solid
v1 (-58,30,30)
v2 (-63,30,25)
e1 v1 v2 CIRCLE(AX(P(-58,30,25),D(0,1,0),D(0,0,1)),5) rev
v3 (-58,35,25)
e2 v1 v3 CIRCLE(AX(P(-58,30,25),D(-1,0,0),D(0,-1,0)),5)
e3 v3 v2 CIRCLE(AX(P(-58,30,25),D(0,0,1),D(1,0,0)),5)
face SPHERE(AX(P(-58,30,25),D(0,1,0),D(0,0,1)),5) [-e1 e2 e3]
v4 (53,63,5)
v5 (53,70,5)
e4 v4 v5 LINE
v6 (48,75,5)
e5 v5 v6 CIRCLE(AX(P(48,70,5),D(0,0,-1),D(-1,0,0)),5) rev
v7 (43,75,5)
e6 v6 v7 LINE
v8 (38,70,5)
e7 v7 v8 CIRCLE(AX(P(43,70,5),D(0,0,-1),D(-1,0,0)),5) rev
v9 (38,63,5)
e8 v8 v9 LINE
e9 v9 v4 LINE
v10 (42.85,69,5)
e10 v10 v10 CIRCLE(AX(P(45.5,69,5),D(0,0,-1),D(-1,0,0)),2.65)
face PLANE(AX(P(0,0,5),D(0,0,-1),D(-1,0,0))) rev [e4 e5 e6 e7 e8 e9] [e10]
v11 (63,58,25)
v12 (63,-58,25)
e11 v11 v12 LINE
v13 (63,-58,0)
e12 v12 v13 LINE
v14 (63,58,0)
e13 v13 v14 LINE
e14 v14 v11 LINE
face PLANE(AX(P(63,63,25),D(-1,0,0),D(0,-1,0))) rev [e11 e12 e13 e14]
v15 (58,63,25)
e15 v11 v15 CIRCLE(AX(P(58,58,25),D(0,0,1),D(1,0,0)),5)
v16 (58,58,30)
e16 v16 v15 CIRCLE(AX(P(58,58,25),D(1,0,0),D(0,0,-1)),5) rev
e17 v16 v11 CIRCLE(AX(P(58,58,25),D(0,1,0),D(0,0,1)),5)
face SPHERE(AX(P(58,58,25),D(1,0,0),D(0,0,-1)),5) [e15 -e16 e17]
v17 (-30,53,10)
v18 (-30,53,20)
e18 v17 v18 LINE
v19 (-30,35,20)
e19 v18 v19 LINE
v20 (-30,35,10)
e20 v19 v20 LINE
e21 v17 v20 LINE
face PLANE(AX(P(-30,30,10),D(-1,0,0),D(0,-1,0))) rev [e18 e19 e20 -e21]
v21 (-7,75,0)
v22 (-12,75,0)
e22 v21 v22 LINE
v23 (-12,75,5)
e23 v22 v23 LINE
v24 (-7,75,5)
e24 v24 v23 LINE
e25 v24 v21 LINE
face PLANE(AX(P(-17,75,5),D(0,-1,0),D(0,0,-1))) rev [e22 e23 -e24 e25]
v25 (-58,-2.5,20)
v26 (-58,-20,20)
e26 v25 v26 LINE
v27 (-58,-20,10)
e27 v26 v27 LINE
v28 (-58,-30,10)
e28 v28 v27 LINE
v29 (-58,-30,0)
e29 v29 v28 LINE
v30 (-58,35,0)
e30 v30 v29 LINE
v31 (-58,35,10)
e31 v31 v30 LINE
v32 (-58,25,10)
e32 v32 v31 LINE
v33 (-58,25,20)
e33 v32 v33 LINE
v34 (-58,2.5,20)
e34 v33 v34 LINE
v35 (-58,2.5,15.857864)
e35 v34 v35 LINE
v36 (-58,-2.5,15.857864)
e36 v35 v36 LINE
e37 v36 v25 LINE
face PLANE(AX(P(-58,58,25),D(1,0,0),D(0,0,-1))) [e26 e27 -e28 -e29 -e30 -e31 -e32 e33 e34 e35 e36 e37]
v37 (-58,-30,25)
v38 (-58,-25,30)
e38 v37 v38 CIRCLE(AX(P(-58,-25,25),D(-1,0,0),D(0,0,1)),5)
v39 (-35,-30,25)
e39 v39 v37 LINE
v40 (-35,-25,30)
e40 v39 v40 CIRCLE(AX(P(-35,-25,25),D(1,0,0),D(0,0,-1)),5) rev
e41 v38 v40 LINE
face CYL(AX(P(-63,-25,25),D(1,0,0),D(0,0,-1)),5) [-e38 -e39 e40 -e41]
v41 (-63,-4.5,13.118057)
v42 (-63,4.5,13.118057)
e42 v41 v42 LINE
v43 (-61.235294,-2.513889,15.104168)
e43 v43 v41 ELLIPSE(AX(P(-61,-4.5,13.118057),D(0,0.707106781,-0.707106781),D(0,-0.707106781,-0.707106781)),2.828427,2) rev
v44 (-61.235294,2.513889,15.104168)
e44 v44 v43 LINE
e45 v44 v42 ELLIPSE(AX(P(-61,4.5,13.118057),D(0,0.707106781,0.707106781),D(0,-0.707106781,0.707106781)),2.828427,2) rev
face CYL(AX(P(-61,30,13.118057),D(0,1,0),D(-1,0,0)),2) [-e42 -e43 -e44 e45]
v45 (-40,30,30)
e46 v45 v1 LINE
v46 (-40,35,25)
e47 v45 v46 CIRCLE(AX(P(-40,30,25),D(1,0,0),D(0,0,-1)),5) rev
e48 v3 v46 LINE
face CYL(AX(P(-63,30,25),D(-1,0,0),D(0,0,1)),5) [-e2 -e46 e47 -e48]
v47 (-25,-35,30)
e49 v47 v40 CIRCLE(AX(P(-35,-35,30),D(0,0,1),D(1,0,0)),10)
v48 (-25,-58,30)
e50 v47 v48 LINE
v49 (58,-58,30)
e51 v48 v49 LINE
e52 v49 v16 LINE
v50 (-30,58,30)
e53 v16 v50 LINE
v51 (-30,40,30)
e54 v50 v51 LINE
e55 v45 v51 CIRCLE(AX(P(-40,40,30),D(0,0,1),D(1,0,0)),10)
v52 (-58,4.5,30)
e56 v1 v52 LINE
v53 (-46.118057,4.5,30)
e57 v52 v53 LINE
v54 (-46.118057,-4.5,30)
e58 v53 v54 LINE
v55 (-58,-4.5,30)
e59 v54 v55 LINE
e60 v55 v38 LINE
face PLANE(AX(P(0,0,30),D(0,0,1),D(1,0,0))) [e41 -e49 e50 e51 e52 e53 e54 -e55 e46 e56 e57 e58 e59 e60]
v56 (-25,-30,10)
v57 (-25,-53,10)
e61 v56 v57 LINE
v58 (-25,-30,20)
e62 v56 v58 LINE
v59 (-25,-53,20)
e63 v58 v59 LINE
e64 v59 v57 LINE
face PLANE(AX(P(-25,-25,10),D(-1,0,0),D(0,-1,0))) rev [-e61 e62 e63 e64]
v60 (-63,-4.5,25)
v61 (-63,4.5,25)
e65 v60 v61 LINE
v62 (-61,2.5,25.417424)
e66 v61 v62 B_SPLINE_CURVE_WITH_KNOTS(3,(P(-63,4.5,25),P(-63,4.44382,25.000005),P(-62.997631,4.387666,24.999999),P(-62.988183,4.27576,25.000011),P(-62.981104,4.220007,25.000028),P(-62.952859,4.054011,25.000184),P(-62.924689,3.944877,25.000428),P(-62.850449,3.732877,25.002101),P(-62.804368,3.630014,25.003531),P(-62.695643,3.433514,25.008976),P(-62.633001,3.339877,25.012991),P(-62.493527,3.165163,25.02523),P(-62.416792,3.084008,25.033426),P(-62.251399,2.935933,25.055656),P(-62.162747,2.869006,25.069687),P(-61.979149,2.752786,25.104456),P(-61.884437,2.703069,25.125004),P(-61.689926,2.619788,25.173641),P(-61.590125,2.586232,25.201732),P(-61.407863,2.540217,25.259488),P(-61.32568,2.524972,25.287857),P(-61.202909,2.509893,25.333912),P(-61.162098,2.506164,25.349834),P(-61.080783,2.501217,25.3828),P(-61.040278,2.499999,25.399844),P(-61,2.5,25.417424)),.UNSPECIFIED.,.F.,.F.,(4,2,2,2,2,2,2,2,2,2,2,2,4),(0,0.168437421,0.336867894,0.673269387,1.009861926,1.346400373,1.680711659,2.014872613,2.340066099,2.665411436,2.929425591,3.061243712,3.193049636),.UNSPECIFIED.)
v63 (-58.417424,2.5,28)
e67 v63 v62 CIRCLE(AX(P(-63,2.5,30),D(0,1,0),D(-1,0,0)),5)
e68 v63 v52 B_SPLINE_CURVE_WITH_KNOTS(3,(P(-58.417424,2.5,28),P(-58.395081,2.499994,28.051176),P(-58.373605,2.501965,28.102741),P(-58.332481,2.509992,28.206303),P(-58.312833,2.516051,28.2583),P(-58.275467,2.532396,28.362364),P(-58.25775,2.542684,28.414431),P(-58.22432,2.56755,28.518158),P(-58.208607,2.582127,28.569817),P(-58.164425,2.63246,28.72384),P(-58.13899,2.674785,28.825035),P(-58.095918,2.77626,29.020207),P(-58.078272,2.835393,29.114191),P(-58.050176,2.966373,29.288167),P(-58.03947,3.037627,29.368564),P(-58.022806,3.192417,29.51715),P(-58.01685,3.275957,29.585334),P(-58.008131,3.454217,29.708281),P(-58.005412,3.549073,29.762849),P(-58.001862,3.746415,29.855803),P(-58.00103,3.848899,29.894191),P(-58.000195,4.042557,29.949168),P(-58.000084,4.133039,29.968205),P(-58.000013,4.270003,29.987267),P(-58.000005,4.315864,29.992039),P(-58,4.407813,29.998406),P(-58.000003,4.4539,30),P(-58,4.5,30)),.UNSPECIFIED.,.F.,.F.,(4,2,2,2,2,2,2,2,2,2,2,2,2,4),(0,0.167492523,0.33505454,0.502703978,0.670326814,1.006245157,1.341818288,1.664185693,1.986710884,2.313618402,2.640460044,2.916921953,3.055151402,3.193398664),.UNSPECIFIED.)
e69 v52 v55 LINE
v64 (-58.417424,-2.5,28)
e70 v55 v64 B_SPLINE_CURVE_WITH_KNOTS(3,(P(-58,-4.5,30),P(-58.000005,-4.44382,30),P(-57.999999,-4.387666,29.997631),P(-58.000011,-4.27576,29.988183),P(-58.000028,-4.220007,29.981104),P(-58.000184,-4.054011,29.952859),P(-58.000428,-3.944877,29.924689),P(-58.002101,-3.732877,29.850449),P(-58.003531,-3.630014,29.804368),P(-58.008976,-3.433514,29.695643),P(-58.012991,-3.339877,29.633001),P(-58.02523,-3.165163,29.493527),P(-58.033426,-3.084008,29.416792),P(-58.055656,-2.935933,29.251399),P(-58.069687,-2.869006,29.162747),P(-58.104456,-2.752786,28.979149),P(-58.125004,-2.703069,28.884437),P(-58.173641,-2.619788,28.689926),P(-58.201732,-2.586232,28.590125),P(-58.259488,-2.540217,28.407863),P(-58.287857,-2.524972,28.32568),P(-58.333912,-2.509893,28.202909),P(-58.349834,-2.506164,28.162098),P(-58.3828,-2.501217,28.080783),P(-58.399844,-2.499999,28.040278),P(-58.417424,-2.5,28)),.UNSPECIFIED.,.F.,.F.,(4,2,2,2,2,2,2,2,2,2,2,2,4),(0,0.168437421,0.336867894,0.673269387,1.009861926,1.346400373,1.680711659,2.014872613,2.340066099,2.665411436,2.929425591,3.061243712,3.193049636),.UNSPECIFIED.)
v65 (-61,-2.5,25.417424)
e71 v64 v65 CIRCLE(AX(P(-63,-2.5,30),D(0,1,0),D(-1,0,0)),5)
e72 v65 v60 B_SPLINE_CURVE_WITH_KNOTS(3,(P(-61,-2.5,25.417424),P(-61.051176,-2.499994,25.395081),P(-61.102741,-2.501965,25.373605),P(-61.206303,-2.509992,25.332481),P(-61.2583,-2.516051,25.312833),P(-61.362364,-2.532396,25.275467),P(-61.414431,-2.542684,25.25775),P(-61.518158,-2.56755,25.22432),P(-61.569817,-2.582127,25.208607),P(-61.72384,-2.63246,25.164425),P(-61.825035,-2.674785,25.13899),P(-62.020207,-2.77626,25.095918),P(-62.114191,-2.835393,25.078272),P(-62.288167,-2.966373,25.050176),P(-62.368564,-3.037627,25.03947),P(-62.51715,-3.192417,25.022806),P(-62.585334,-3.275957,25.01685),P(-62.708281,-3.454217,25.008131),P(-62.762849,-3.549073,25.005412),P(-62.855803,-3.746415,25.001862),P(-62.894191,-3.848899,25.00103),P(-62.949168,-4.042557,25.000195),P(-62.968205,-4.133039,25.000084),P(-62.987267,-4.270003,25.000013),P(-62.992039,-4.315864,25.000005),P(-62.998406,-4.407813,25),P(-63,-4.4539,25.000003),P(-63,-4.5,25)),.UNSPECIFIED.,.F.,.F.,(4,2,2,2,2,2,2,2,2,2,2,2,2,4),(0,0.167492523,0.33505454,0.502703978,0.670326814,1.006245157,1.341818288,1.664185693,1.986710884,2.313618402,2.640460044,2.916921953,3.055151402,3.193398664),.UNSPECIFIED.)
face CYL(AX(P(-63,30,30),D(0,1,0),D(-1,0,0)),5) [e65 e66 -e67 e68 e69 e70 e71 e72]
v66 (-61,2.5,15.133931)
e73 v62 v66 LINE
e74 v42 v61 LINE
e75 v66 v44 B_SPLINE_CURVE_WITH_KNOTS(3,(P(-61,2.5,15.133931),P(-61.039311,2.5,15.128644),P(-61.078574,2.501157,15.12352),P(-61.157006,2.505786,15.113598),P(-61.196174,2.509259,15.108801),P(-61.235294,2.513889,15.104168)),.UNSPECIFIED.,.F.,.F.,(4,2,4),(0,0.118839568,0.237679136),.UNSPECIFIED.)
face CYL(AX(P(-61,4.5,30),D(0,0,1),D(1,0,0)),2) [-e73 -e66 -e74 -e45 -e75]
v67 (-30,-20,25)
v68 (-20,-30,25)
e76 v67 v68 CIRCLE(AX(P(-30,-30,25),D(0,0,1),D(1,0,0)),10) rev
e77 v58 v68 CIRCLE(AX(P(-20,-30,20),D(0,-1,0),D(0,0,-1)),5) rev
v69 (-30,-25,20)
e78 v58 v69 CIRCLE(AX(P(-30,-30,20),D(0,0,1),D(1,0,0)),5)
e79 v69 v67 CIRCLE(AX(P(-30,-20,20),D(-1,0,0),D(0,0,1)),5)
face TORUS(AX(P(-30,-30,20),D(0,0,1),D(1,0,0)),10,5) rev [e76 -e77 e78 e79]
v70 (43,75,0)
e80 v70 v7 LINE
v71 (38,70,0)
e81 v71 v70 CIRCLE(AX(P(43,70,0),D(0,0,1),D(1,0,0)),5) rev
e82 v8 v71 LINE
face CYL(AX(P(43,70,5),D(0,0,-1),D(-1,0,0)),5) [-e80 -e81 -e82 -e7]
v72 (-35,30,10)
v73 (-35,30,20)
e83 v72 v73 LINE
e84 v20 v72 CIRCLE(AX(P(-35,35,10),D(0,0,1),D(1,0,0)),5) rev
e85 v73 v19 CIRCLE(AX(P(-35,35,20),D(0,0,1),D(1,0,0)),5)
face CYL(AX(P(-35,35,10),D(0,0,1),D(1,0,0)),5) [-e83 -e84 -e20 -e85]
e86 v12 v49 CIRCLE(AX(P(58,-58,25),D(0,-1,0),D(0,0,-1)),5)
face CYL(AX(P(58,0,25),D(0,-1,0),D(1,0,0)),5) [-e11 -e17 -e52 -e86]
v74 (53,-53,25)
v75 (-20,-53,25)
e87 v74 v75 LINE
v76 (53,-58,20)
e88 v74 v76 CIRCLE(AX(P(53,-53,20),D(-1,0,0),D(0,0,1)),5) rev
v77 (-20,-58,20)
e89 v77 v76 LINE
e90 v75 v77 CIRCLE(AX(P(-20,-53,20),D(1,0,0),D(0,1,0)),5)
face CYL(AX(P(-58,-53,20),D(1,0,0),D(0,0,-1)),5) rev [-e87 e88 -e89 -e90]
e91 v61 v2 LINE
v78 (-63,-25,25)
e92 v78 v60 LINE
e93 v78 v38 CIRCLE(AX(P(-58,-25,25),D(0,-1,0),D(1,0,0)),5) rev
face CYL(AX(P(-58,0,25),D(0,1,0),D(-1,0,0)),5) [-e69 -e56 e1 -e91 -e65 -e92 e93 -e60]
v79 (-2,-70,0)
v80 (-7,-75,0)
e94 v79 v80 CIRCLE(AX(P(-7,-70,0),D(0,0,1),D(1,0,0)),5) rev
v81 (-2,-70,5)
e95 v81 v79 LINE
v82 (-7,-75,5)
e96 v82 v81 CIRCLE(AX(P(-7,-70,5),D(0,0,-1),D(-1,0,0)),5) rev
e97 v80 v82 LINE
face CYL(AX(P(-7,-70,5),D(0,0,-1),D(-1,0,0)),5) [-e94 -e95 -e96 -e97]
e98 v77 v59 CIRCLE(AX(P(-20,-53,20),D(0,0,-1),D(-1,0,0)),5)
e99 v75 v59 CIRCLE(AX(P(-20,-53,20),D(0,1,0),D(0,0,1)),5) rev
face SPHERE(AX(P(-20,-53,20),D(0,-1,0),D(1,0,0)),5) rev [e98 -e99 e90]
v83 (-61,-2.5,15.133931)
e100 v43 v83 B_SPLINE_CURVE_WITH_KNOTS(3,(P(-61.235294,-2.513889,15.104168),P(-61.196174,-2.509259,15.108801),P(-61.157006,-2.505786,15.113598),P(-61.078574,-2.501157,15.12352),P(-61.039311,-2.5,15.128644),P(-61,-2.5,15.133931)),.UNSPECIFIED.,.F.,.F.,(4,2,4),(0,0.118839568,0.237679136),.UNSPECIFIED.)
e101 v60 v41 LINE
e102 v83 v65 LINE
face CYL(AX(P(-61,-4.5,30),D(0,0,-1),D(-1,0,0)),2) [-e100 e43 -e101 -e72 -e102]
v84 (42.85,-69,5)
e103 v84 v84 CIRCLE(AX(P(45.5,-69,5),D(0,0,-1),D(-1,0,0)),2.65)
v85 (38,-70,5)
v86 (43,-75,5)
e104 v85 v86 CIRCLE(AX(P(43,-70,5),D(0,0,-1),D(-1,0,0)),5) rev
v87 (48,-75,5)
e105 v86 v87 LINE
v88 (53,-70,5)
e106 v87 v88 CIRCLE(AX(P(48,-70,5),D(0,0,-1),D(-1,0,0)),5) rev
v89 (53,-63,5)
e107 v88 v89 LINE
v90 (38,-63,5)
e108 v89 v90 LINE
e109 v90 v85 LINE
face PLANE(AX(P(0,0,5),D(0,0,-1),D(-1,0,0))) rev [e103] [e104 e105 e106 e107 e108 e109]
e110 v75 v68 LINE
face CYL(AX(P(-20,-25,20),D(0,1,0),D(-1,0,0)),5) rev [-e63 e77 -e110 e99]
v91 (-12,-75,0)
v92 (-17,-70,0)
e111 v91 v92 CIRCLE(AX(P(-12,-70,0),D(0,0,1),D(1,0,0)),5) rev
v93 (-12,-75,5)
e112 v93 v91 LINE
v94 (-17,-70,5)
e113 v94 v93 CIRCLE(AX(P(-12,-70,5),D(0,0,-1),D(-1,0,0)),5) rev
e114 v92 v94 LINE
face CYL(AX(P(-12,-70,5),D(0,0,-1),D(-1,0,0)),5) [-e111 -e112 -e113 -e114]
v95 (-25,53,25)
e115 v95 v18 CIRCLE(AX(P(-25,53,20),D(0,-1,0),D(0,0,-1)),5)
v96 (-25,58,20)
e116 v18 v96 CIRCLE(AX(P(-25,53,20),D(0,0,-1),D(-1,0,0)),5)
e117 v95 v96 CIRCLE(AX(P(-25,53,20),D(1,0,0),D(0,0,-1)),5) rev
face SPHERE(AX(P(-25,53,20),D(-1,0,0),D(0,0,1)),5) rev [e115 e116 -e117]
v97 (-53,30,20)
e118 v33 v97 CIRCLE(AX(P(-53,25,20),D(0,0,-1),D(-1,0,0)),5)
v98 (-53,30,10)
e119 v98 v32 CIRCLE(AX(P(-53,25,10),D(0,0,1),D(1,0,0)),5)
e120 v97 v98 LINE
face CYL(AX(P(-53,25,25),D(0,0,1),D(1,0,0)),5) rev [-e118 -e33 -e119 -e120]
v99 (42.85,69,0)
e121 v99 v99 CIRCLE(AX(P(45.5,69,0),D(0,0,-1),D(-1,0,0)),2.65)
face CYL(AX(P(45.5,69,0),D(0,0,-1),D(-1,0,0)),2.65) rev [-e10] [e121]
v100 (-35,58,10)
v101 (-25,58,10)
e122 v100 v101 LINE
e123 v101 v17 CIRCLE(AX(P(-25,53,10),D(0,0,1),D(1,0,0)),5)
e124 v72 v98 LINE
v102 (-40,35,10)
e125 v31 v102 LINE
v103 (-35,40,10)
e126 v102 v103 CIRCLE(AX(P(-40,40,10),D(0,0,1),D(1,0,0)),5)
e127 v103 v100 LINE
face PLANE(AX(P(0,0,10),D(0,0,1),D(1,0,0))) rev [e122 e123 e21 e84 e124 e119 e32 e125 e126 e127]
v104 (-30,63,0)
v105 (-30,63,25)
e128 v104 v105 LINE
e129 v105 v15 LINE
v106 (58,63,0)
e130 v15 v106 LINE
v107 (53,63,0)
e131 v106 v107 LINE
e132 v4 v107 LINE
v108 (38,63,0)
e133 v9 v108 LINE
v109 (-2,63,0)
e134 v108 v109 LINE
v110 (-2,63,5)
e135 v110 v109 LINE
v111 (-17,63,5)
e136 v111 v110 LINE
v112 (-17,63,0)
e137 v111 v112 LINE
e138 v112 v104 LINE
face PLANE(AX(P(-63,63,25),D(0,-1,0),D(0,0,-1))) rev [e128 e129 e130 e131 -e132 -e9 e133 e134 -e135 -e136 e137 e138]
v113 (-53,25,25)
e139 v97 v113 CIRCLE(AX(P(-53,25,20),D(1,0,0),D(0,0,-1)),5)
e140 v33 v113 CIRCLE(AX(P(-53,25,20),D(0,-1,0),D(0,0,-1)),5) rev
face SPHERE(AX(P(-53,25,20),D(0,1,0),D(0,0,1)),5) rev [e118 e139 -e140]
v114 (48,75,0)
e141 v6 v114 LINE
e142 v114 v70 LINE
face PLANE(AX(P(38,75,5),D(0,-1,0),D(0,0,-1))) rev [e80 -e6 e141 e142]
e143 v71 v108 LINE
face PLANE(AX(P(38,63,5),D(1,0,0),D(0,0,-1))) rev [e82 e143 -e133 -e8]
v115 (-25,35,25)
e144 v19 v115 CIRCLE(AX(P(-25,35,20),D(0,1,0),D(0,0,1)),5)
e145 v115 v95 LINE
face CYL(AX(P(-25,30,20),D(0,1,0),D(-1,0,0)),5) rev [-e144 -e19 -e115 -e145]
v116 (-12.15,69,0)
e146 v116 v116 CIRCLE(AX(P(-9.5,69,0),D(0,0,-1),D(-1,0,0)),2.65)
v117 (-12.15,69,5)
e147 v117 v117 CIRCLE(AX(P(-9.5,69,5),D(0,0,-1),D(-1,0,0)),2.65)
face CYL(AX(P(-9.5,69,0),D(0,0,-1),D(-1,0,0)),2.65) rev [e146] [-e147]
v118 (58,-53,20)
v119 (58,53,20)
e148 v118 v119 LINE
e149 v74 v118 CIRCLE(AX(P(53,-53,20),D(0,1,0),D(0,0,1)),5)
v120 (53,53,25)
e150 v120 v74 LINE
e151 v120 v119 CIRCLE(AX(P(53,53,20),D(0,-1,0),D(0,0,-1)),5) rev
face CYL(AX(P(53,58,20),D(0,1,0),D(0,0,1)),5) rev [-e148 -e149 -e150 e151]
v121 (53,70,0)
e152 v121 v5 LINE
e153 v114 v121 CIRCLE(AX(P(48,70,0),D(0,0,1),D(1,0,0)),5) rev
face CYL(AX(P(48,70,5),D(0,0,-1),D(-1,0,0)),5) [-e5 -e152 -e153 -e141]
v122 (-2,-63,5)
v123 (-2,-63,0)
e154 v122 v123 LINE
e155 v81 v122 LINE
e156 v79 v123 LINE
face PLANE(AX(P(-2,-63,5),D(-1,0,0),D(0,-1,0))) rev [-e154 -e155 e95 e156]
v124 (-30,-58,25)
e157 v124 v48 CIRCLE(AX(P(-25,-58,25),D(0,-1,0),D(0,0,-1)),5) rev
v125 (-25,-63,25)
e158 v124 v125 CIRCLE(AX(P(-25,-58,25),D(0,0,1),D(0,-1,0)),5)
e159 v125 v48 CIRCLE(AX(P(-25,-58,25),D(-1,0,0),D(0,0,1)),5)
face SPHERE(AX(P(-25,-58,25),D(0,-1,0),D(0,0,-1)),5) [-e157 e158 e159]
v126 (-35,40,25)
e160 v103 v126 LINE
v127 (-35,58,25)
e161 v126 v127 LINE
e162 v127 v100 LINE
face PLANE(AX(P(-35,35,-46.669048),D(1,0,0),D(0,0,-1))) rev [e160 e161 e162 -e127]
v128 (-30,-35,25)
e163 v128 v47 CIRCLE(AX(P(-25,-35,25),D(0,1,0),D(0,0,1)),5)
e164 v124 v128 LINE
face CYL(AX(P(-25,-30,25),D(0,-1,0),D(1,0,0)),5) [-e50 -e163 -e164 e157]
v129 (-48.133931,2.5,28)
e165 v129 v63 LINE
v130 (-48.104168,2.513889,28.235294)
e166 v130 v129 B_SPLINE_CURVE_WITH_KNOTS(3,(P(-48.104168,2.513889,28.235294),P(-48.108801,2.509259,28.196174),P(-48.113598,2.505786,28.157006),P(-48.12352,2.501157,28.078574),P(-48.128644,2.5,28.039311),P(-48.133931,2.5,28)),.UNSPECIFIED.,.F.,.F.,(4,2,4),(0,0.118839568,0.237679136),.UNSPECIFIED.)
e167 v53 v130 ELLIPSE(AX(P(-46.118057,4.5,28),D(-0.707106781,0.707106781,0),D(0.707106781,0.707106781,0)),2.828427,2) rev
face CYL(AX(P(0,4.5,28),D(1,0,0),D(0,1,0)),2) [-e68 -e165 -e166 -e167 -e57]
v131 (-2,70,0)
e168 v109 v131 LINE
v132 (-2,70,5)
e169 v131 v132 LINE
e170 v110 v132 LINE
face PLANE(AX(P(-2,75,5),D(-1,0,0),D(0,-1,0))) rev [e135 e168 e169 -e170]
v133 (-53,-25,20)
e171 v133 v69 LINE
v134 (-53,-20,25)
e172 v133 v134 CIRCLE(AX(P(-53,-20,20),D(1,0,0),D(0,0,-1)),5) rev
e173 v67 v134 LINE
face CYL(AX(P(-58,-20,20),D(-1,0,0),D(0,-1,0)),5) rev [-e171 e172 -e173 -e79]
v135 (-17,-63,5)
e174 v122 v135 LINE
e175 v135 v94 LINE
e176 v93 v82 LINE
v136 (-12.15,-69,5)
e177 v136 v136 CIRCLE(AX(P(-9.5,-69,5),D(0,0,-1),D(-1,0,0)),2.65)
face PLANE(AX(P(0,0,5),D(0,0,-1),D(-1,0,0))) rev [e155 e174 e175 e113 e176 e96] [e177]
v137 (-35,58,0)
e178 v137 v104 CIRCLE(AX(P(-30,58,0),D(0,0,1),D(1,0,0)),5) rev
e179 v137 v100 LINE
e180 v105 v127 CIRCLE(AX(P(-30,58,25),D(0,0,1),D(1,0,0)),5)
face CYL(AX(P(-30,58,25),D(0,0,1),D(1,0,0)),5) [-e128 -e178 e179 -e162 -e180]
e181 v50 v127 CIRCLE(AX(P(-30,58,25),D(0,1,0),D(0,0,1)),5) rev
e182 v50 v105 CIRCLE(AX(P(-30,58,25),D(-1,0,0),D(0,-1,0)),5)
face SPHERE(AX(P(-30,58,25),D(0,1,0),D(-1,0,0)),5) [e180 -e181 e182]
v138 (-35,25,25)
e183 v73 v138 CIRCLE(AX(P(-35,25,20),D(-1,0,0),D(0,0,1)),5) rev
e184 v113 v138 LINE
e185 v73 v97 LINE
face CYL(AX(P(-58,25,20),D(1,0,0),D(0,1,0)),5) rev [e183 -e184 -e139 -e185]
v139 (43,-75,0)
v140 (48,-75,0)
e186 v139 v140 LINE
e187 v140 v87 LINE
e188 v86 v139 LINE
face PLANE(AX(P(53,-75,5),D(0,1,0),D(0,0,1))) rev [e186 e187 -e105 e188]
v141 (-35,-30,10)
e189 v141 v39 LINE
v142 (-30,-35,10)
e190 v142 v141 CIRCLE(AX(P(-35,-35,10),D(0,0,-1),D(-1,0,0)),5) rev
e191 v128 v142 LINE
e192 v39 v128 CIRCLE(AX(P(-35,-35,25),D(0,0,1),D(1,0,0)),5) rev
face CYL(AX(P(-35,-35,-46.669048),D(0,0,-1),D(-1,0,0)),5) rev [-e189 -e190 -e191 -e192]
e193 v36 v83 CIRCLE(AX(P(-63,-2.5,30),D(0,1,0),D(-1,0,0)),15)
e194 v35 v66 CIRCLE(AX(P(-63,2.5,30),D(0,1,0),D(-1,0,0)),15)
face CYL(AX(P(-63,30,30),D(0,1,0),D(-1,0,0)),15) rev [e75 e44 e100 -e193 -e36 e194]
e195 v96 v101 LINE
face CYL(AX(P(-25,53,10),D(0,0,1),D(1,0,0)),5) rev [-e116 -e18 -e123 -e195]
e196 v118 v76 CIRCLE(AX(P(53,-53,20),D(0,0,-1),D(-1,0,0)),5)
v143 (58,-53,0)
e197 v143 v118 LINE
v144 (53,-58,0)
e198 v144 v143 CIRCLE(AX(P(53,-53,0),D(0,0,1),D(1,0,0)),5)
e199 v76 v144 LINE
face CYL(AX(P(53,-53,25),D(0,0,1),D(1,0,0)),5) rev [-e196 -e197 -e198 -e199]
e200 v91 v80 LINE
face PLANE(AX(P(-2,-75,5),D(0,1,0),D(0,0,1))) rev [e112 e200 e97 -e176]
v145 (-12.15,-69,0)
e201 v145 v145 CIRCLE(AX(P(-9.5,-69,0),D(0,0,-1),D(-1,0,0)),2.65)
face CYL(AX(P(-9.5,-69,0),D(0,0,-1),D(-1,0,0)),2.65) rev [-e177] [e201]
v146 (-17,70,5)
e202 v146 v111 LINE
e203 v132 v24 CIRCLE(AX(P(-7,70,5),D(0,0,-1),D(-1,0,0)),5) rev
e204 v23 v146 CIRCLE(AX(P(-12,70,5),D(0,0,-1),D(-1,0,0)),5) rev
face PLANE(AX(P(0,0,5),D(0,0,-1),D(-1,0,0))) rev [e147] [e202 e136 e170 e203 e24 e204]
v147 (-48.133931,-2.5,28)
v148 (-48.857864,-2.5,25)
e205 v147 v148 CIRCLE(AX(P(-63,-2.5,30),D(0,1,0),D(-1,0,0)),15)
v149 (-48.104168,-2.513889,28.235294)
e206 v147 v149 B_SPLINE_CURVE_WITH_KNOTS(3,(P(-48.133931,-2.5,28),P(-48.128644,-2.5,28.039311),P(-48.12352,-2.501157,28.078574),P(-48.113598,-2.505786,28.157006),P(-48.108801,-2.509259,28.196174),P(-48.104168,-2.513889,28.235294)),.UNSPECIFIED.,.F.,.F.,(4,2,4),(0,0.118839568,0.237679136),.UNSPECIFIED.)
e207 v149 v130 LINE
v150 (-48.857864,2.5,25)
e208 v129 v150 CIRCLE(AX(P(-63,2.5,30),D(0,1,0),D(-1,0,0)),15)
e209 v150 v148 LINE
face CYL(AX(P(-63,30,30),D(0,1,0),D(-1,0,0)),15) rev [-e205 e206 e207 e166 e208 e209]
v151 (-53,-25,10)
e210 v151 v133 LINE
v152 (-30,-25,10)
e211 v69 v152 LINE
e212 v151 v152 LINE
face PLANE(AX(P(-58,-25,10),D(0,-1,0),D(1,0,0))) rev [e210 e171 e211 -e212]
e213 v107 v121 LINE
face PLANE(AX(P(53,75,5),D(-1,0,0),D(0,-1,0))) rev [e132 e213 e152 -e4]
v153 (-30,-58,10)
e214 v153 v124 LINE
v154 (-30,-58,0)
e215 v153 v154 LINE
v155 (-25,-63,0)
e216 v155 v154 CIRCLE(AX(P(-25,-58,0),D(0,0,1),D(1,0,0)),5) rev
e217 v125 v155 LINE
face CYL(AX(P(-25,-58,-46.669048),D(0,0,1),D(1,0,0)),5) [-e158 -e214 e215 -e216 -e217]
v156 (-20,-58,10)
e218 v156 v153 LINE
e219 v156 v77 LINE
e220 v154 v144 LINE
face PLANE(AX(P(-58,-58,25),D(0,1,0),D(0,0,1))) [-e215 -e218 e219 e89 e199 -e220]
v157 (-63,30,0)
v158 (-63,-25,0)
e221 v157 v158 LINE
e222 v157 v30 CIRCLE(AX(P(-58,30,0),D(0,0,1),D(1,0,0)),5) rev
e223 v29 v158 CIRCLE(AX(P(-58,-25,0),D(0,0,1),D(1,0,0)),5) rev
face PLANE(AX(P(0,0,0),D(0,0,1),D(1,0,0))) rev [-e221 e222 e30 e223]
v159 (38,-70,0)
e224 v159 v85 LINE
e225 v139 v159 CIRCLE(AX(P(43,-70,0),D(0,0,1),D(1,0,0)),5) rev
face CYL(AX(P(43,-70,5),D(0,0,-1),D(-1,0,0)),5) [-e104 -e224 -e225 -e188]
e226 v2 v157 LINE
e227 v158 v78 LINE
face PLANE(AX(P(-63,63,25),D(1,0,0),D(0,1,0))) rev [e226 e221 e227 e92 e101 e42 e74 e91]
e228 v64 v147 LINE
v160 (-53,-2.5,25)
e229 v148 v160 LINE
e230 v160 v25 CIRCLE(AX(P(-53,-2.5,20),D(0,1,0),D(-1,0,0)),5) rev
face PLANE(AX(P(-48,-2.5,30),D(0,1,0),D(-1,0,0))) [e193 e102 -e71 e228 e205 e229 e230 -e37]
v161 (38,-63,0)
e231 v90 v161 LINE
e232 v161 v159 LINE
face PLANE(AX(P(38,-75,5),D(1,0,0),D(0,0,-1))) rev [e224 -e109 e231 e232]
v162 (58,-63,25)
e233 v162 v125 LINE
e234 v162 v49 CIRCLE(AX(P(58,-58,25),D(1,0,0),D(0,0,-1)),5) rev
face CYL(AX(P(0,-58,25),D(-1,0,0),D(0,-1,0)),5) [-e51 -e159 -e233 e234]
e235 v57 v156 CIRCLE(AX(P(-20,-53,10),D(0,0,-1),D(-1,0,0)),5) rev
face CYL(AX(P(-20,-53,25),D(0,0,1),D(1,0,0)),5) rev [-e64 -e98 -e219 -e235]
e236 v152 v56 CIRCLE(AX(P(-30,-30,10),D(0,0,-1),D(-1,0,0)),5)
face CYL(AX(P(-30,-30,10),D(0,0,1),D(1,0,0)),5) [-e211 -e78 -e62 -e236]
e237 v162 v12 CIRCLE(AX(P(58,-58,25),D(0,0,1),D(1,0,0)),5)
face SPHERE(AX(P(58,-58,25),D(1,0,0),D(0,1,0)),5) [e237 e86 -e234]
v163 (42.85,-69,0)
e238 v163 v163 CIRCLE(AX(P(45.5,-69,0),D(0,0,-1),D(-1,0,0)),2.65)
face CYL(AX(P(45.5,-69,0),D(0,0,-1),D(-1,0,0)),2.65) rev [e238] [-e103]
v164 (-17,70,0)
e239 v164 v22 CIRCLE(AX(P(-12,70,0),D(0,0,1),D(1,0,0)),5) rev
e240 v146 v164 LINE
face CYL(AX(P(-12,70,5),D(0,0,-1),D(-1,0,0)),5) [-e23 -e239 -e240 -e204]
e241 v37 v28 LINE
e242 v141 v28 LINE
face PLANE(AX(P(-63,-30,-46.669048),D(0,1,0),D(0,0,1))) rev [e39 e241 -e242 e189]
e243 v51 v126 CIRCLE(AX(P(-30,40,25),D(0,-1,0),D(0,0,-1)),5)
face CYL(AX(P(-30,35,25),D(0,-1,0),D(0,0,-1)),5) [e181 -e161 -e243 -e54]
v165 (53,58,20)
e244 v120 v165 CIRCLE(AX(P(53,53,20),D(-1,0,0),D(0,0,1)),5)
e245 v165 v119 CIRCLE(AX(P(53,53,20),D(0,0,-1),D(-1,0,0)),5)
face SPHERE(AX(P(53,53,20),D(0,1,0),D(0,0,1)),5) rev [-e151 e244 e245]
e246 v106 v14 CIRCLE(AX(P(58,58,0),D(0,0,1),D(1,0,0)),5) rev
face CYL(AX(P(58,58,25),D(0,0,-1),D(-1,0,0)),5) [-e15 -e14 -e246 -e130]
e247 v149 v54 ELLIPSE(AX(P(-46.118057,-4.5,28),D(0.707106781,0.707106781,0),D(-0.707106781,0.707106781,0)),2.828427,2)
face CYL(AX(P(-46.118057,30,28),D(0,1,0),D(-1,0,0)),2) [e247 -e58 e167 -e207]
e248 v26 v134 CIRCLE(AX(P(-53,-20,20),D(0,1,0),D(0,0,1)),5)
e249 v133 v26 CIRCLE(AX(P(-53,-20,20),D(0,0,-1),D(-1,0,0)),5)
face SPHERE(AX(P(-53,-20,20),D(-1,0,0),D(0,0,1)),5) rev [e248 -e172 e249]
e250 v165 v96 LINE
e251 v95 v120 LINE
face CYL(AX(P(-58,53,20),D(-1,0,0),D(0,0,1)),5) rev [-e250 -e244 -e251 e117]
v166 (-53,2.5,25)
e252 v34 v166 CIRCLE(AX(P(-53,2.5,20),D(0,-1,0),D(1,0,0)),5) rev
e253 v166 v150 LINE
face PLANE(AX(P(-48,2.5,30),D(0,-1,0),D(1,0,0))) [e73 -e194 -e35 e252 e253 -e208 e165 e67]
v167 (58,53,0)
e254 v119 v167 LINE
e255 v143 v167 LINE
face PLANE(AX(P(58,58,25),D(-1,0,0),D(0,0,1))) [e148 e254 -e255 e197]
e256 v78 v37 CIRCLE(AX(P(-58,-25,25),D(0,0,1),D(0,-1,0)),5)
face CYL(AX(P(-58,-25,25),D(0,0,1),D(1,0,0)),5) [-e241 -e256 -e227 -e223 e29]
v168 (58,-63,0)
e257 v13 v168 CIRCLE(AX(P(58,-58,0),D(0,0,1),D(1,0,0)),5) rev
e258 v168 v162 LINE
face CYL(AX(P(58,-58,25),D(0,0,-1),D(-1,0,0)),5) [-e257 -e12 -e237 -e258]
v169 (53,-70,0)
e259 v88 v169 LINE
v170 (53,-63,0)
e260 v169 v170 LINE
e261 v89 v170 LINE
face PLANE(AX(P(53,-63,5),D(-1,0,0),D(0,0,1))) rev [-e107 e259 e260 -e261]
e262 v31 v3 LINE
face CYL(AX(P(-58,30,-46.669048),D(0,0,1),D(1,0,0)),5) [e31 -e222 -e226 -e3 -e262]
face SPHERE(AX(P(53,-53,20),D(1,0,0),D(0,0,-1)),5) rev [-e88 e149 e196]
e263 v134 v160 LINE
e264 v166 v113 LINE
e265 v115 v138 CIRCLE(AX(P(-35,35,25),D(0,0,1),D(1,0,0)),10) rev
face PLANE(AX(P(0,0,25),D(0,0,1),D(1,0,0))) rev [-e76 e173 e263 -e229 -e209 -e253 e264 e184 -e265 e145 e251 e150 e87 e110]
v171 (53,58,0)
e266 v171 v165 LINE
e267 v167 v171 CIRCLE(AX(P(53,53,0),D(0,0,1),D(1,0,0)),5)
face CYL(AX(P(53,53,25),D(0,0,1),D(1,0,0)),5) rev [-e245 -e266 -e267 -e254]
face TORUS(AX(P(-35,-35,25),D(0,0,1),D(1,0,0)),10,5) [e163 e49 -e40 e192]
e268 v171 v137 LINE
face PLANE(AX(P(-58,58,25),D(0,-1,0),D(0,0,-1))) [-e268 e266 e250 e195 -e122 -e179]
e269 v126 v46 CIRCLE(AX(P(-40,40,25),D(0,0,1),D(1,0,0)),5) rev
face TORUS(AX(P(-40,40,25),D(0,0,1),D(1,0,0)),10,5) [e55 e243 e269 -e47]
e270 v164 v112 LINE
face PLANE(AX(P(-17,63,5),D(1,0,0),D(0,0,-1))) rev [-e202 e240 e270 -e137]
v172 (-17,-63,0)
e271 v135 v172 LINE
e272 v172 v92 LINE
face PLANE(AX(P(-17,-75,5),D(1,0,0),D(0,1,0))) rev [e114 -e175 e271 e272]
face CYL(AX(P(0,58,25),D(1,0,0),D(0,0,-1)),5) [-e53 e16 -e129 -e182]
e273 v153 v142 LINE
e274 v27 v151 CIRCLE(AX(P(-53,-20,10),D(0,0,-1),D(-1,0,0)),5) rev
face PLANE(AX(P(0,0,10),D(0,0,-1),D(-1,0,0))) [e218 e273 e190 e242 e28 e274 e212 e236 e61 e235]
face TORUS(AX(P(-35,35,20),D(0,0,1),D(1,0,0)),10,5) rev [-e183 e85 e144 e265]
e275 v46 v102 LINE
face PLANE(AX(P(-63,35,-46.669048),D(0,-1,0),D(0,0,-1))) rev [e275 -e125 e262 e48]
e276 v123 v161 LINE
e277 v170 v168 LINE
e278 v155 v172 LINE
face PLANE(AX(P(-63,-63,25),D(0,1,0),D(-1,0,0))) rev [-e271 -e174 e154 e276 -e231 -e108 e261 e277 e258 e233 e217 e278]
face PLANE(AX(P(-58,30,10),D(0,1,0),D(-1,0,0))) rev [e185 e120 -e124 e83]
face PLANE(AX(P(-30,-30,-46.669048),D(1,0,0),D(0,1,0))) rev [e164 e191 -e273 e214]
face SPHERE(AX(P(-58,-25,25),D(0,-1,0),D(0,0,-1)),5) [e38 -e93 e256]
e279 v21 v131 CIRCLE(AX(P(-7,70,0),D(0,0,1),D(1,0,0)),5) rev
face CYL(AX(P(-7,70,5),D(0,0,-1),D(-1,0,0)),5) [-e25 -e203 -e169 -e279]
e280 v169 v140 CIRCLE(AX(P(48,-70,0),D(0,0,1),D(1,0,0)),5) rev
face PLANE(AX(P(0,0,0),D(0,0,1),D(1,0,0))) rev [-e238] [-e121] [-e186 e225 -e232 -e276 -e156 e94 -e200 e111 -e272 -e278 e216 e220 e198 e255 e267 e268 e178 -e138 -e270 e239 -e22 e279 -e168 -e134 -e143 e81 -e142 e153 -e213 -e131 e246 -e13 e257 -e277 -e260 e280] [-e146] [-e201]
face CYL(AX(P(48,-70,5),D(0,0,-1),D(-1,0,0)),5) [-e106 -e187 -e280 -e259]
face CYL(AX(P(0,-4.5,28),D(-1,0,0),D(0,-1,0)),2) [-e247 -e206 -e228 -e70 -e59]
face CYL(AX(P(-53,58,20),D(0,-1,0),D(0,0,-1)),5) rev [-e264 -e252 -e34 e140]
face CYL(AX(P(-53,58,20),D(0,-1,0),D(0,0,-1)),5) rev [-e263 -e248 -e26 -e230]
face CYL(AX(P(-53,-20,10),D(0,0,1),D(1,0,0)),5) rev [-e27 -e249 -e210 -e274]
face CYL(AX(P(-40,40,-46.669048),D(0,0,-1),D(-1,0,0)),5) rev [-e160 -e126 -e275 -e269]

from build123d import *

# Parameters (mm, degrees)
ESQUISSE1_W             = 126
ESQUISSE1_H             = 126
ESQUISSE1_W_2           = 116
ESQUISSE1_H_2           = 116
BOSS_EXTRU_1_DEPTH      = 25
ESQUISSE2_W             = 126
ESQUISSE2_H             = 126
BOSS_EXTRU_2_DEPTH      = 5
ENL_V_START             = -30
ESQUISSE3_W             = 28
ESQUISSE3_H             = 28
ESQUISSE3_W_2           = 33
ESQUISSE3_H_2           = 33
ENL_V_MAT_EXTRU_1_DEPTH = 30
BOSS_EXTRU_3_DEPTH      = 15
ESQUISSE5_W             = 15
ESQUISSE5_H             = 12
BOSS_EXTRU_4_DEPTH      = 5
CONG_1_R                = 5
D_GAGEMENT_M51_D        = 5.3
ESQUISSE9_W             = 10
ESQUISSE9_H             = 5
CONG_2_R                = 2


# Some blends are built 0.0001 mm under size
with BuildPart() as part:
    # Esquisse1 → Boss.-Extru.1 (new body)
    with BuildSketch(Plane.XY):
        Rectangle(ESQUISSE1_W, ESQUISSE1_H)
        Rectangle(ESQUISSE1_W_2, ESQUISSE1_H_2, mode=Mode.SUBTRACT)
    extrude(amount=BOSS_EXTRU_1_DEPTH)

    # Esquisse2 → Boss.-Extru.2 (add)
    with BuildSketch(Plane.XY.offset(25)):
        Rectangle(ESQUISSE2_W, ESQUISSE2_H)
    extrude(amount=BOSS_EXTRU_2_DEPTH)

    # Esquisse3 → Enlèv. mat.-Extru.1 (cut)
    with BuildSketch(Plane.XY.offset(30).offset(ENL_V_START)):
        with Locations((-49, 49)):
            Rectangle(ESQUISSE3_W, ESQUISSE3_H)
        with Locations((-46.5, -46.5)):
            Rectangle(ESQUISSE3_W_2, ESQUISSE3_H_2)
    extrude(amount=ENL_V_MAT_EXTRU_1_DEPTH, mode=Mode.SUBTRACT)

    # Esquisse4 → Boss.-Extru.3 (add)
    with BuildSketch(Plane(origin=(0, 0, 25), x_dir=(-1, 0, 0), z_dir=(0, 0, -1))):
        Polygon((35, 58), (35, 35), (58, 35), (58, 30), (30, 30), (30, 58), align=None)
        Polygon((58, -25), (25, -25), (25, -58), (30, -58), (30, -30), (58, -30), align=None)
    extrude(amount=BOSS_EXTRU_3_DEPTH)

    # Esquisse5 → Boss.-Extru.4 (add)
    with BuildSketch(Plane.XY):
        with Locations((-9.5, 69)):
            Rectangle(ESQUISSE5_W, ESQUISSE5_H)
        with Locations((45.5, 69)):
            Rectangle(ESQUISSE5_W, ESQUISSE5_H)
        with Locations((45.5, -69)):
            Rectangle(ESQUISSE5_W, ESQUISSE5_H)
        with Locations((-9.5, -69)):
            Rectangle(ESQUISSE5_W, ESQUISSE5_H)
    extrude(amount=BOSS_EXTRU_4_DEPTH)

    # Congé1
    cong_1_edges = [part.edges().sort_by_distance(p)[0] for p in [
        (-25, -41.5, 25),
        (16.5, -58, 25),
        (58, 0, 25),
        (14, 58, 25),
        (-30, 44, 25),
        (-44, 30, 25),
        (-58, 2.5, 25),
        (-41.5, -25, 25),
        (-63, 2.5, 30),
        (-49, 35, 30),
        (-35, 49, 30),
        (14, 63, 30),
        (63, 0, 30),
        (16.5, -63, 30),
        (-30, -46.5, 30),
        (-46.5, -30, 30),
        (58, -58, 12.5),
        (-25, -58, 17.5),
        (-25, -25, 17.5),
        (-58, -25, 17.5),
        (-58, 30, 17.5),
        (-30, 30, 17.5),
        (-30, 58, 17.5),
        (58, 58, 12.5),
        (53, -75, 2.5),
        (-2, -75, 2.5),
        (38, -75, 2.5),
        (-17, -75, 2.5),
        (-30, -63, 15),
        (-63, 35, 15),
        (-63, -30, 15),
        (-30, -30, 20),
        (-35, 35, 20),
        (53, 75, 2.5),
        (38, 75, 2.5),
        (-2, 75, 2.5),
        (-17, 75, 2.5),
        (63, 63, 15),
        (63, -63, 15),
        (-35, 63, 15),
    ]]
    fillet(cong_1_edges, radius=CONG_1_R - 0.0001)  # a hair under: the kernel refuses the full size

    # Dégagement M51 (through all)
    with Locations(Plane(origin=(0, 0, 0), x_dir=(1, 0, 0), z_dir=(0, 0, -1))):
        with Locations((-9.5, 69), (45.5, 69), (45.5, -69), (-9.5, -69)):
            Hole(D_GAGEMENT_M51_D / 2)

    # Esquisse9 → Enlèvement de matière-Révolution1 (revolve, cut)
    with BuildSketch(Plane.XY.offset(30)):
        with Locations((-53, 0)):
            Rectangle(ESQUISSE9_W, ESQUISSE9_H)
    revolve(axis=Axis((-63, 30, 30), (0, -1, 0)), mode=Mode.SUBTRACT)

    # Congé2
    # the kernel refuses this fillet: 2 mm, written as the material it takes off along each edge
    with BuildSketch(Plane(origin=(-48, -2.5, 30), x_dir=(1, 0, 0), z_dir=(0, 1, 0))) as cong_2_piece_1:
        with BuildLine():
            CenterArc((1.881943016, 2), CONG_2_R, 186.756327031, 83.243672969)
            ThreePointArc((-0.104167927, 1.764705882), (-0.026064627, 0.883888823), (0, 0))
            Line((0, 0), (1.881943016, 0))
        make_face()
    extrude(amount=5, mode=Mode.SUBTRACT)
    with BuildSketch(Plane(origin=(-43, 2.5, 30), x_dir=(0, 1, 0), z_dir=(-1, 0, 0))) as cong_2_piece_2_section:
        with BuildLine():
            CenterArc((CONG_2_R, CONG_2_R), CONG_2_R, 180, 90)
            Line((0, CONG_2_R), (0, 0))
            Line((0, 0), (CONG_2_R, 0))
        make_face()
    cong_2_piece_2 = extrude(amount=20, mode=Mode.PRIVATE)
    cong_2_piece_2 = cong_2_piece_2 & Plane(origin=(-63, 2.951907802, 30), x_dir=(1, 0, 0), z_dir=(0, 1, 0)) * Cylinder(15, 48, mode=Mode.PRIVATE)
    cong_2_piece_2 = cong_2_piece_2 - Plane(origin=(-63, 2.951907802, 30), x_dir=(1, 0, 0), z_dir=(0, -1, 0)) * Cylinder(5, 48, mode=Mode.PRIVATE)
    add(cong_2_piece_2, mode=Mode.SUBTRACT)
    with BuildSketch(Plane(origin=(-63, -2.5, 30), x_dir=(0, -1, 0), z_dir=(1, 0, 0))) as cong_2_piece_3_section:
        with BuildLine():
            CenterArc((CONG_2_R, CONG_2_R), CONG_2_R, 180, 90)
            Line((0, CONG_2_R), (0, 0))
            Line((0, 0), (CONG_2_R, 0))
        make_face()
    cong_2_piece_3 = extrude(amount=20, mode=Mode.PRIVATE)
    cong_2_piece_3 = cong_2_piece_3 & Plane(origin=(-63, -2.951907802, 30), x_dir=(1, 0, 0), z_dir=(0, 1, 0)) * Cylinder(15, 48, mode=Mode.PRIVATE)
    cong_2_piece_3 = cong_2_piece_3 - Plane(origin=(-63, -2.951907802, 30), x_dir=(1, 0, 0), z_dir=(0, -1, 0)) * Cylinder(5, 48, mode=Mode.PRIVATE)
    add(cong_2_piece_3, mode=Mode.SUBTRACT)
    with BuildSketch(Plane(origin=(-63, 2.5, 30), x_dir=(1, 0, 0), z_dir=(0, 0, -1))) as cong_2_piece_4_section:
        with BuildLine():
            CenterArc((CONG_2_R, -CONG_2_R), CONG_2_R, 90, 90)
            Line((0, -CONG_2_R), (0, 0))
            Line((0, 0), (CONG_2_R, 0))
        make_face()
    cong_2_piece_4 = extrude(amount=20, mode=Mode.PRIVATE)
    cong_2_piece_4 = cong_2_piece_4 & Plane(origin=(-63, 2.951908225, 30), x_dir=(1, 0, 0), z_dir=(0, 1, 0)) * Cylinder(15, 49, mode=Mode.PRIVATE)
    cong_2_piece_4 = cong_2_piece_4 - Plane(origin=(-63, 2.951908225, 30), x_dir=(1, 0, 0), z_dir=(0, -1, 0)) * Cylinder(5, 49, mode=Mode.PRIVATE)
    add(cong_2_piece_4, mode=Mode.SUBTRACT)
    with BuildSketch(Plane(origin=(-63, -2.5, 15), x_dir=(0, 0, -1), z_dir=(0, 1, 0))) as cong_2_piece_5:
        with BuildLine():
            CenterArc((1.881943016, -2), CONG_2_R, 90, 83.243672969)
            ThreePointArc((-0.104167927, -1.764705882), (-0.026064627, -0.883888823), (0, 0))
            Line((0, 0), (1.881943016, 0))
        make_face()
    extrude(amount=5, mode=Mode.SUBTRACT)
    with BuildSketch(Plane(origin=(-63, -2.5, 10), x_dir=(1, 0, 0), z_dir=(0, 0, 1))) as cong_2_piece_6_section:
        with BuildLine():
            CenterArc((CONG_2_R, -CONG_2_R), CONG_2_R, 90, 90)
            Line((0, -CONG_2_R), (0, 0))
            Line((0, 0), (CONG_2_R, 0))
        make_face()
    cong_2_piece_6 = extrude(amount=20, mode=Mode.PRIVATE)
    cong_2_piece_6 = cong_2_piece_6 - Plane(origin=(-63, -2.951908225, 30), x_dir=(1, 0, 0), z_dir=(0, -1, 0)) * Cylinder(5, 48, mode=Mode.PRIVATE)
    cong_2_piece_6 = cong_2_piece_6 & Plane(origin=(-63, -2.951908225, 30), x_dir=(1, 0, 0), z_dir=(0, 1, 0)) * Cylinder(15, 48, mode=Mode.PRIVATE)
    add(cong_2_piece_6, mode=Mode.SUBTRACT)
    with BuildSketch(Plane(origin=(-48, -7.20485754, 30), x_dir=(1, 0, 0), z_dir=(0, 1, 0))) as cong_2_piece_7a_section:
        with BuildLine():
            CenterArc((1.881943016, 2), CONG_2_R, 186.756327031, 83.243672969)
            ThreePointArc((-0.104167927, 1.764705882), (-0.026064627, 0.883888823), (0, 0))
            Line((0, 0), (1.881943016, 0))
        make_face()
    cong_2_piece_7a = extrude(amount=9.70485754, mode=Mode.PRIVATE)
    cong_2_piece_7a = split(cong_2_piece_7a, bisect_by=Plane(origin=(-47.580339744, -2.5, 29.603813963), z_dir=(0, -1, 0)), keep=Keep.TOP, mode=Mode.PRIVATE)
    with BuildSketch(Plane(origin=(-63, -2.5, 30), x_dir=(0, -1, 0), z_dir=(1, 0, 0))) as cong_2_piece_7b_section:
        with BuildLine():
            CenterArc((CONG_2_R, CONG_2_R), CONG_2_R, 180, 90)
            Line((0, CONG_2_R), (0, 0))
            Line((0, 0), (CONG_2_R, 0))
        make_face()
    cong_2_piece_7b = extrude(amount=20, mode=Mode.PRIVATE)
    cong_2_piece_7b = cong_2_piece_7b - Plane(origin=(-63, -2.951929409, 30), x_dir=(1, 0, 0), z_dir=(0, 1, 0)) * Cylinder(15, 48, mode=Mode.PRIVATE)
    cong_2_piece_7 = cong_2_piece_7a & cong_2_piece_7b
    add(cong_2_piece_7, mode=Mode.SUBTRACT)
    with BuildSketch(Plane(origin=(-43, 2.5, 30), x_dir=(0, 1, 0), z_dir=(-1, 0, 0))) as cong_2_piece_8a_section:
        with BuildLine():
            CenterArc((CONG_2_R, CONG_2_R), CONG_2_R, 180, 90)
            Line((0, CONG_2_R), (0, 0))
            Line((0, 0), (CONG_2_R, 0))
        make_face()
    cong_2_piece_8a = extrude(amount=20, mode=Mode.PRIVATE)
    cong_2_piece_8a = cong_2_piece_8a - Plane(origin=(-63, 2.951929409, 30), x_dir=(1, 0, 0), z_dir=(0, 1, 0)) * Cylinder(15, 48, mode=Mode.PRIVATE)
    with BuildSketch(Plane(origin=(-48, -2.5, 30), x_dir=(1, 0, 0), z_dir=(0, 1, 0))) as cong_2_piece_8b_section:
        with BuildLine():
            CenterArc((1.881943016, 2), CONG_2_R, 186.756327031, 83.243672969)
            ThreePointArc((-0.104167927, 1.764705882), (-0.026064627, 0.883888823), (0, 0))
            Line((0, 0), (1.881943016, 0))
        make_face()
    cong_2_piece_8b = extrude(amount=9.70485754, mode=Mode.PRIVATE)
    cong_2_piece_8b = split(cong_2_piece_8b, bisect_by=Plane(origin=(-47.580339744, 2.5, 29.603813963), z_dir=(0, 1, 0)), keep=Keep.TOP, mode=Mode.PRIVATE)
    cong_2_piece_8 = cong_2_piece_8a & cong_2_piece_8b
    add(cong_2_piece_8, mode=Mode.SUBTRACT)
    with BuildSketch(Plane(origin=(-63, 2.5, 30), x_dir=(1, 0, 0), z_dir=(0, 0, -1))) as cong_2_piece_9a_section:
        with BuildLine():
            CenterArc((CONG_2_R, -CONG_2_R), CONG_2_R, 90, 90)
            Line((0, -CONG_2_R), (0, 0))
            Line((0, 0), (CONG_2_R, 0))
        make_face()
    cong_2_piece_9a = extrude(amount=20, mode=Mode.PRIVATE)
    cong_2_piece_9a = cong_2_piece_9a - Plane(origin=(-63, 2.951929806, 30), x_dir=(1, 0, 0), z_dir=(0, 1, 0)) * Cylinder(15, 49, mode=Mode.PRIVATE)
    with BuildSketch(Plane(origin=(-63, -2.5, 15), x_dir=(0, 0, -1), z_dir=(0, 1, 0))) as cong_2_piece_9b_section:
        with BuildLine():
            CenterArc((1.881943016, -2), CONG_2_R, 90, 83.243672969)
            ThreePointArc((-0.104167927, -1.764705882), (-0.026064627, -0.883888823), (0, 0))
            Line((0, 0), (1.881943016, 0))
        make_face()
    cong_2_piece_9b = extrude(amount=9.70485754, mode=Mode.PRIVATE)
    cong_2_piece_9b = split(cong_2_piece_9b, bisect_by=Plane(origin=(-62.603813963, 2.5, 14.580339744), z_dir=(0, 1, 0)), keep=Keep.TOP, mode=Mode.PRIVATE)
    cong_2_piece_9 = cong_2_piece_9a & cong_2_piece_9b
    add(cong_2_piece_9, mode=Mode.SUBTRACT)
    with BuildSketch(Plane(origin=(-63, -2.5, 10), x_dir=(1, 0, 0), z_dir=(0, 0, 1))) as cong_2_piece_10a_section:
        with BuildLine():
            CenterArc((CONG_2_R, -CONG_2_R), CONG_2_R, 90, 90)
            Line((0, -CONG_2_R), (0, 0))
            Line((0, 0), (CONG_2_R, 0))
        make_face()
    cong_2_piece_10a = extrude(amount=20, mode=Mode.PRIVATE)
    cong_2_piece_10a = cong_2_piece_10a - Plane(origin=(-63, -2.951929806, 30), x_dir=(1, 0, 0), z_dir=(0, 1, 0)) * Cylinder(15, 48, mode=Mode.PRIVATE)
    with BuildSketch(Plane(origin=(-63, -7.20485754, 15), x_dir=(0, 0, -1), z_dir=(0, 1, 0))) as cong_2_piece_10b_section:
        with BuildLine():
            CenterArc((1.881943016, -2), CONG_2_R, 90, 83.243672969)
            ThreePointArc((-0.104167927, -1.764705882), (-0.026064627, -0.883888823), (0, 0))
            Line((0, 0), (1.881943016, 0))
        make_face()
    cong_2_piece_10b = extrude(amount=9.70485754, mode=Mode.PRIVATE)
    cong_2_piece_10b = split(cong_2_piece_10b, bisect_by=Plane(origin=(-62.603813963, -2.5, 14.580339744), z_dir=(0, -1, 0)), keep=Keep.TOP, mode=Mode.PRIVATE)
    cong_2_piece_10 = cong_2_piece_10a & cong_2_piece_10b
    add(cong_2_piece_10, mode=Mode.SUBTRACT)


solid = part.part
